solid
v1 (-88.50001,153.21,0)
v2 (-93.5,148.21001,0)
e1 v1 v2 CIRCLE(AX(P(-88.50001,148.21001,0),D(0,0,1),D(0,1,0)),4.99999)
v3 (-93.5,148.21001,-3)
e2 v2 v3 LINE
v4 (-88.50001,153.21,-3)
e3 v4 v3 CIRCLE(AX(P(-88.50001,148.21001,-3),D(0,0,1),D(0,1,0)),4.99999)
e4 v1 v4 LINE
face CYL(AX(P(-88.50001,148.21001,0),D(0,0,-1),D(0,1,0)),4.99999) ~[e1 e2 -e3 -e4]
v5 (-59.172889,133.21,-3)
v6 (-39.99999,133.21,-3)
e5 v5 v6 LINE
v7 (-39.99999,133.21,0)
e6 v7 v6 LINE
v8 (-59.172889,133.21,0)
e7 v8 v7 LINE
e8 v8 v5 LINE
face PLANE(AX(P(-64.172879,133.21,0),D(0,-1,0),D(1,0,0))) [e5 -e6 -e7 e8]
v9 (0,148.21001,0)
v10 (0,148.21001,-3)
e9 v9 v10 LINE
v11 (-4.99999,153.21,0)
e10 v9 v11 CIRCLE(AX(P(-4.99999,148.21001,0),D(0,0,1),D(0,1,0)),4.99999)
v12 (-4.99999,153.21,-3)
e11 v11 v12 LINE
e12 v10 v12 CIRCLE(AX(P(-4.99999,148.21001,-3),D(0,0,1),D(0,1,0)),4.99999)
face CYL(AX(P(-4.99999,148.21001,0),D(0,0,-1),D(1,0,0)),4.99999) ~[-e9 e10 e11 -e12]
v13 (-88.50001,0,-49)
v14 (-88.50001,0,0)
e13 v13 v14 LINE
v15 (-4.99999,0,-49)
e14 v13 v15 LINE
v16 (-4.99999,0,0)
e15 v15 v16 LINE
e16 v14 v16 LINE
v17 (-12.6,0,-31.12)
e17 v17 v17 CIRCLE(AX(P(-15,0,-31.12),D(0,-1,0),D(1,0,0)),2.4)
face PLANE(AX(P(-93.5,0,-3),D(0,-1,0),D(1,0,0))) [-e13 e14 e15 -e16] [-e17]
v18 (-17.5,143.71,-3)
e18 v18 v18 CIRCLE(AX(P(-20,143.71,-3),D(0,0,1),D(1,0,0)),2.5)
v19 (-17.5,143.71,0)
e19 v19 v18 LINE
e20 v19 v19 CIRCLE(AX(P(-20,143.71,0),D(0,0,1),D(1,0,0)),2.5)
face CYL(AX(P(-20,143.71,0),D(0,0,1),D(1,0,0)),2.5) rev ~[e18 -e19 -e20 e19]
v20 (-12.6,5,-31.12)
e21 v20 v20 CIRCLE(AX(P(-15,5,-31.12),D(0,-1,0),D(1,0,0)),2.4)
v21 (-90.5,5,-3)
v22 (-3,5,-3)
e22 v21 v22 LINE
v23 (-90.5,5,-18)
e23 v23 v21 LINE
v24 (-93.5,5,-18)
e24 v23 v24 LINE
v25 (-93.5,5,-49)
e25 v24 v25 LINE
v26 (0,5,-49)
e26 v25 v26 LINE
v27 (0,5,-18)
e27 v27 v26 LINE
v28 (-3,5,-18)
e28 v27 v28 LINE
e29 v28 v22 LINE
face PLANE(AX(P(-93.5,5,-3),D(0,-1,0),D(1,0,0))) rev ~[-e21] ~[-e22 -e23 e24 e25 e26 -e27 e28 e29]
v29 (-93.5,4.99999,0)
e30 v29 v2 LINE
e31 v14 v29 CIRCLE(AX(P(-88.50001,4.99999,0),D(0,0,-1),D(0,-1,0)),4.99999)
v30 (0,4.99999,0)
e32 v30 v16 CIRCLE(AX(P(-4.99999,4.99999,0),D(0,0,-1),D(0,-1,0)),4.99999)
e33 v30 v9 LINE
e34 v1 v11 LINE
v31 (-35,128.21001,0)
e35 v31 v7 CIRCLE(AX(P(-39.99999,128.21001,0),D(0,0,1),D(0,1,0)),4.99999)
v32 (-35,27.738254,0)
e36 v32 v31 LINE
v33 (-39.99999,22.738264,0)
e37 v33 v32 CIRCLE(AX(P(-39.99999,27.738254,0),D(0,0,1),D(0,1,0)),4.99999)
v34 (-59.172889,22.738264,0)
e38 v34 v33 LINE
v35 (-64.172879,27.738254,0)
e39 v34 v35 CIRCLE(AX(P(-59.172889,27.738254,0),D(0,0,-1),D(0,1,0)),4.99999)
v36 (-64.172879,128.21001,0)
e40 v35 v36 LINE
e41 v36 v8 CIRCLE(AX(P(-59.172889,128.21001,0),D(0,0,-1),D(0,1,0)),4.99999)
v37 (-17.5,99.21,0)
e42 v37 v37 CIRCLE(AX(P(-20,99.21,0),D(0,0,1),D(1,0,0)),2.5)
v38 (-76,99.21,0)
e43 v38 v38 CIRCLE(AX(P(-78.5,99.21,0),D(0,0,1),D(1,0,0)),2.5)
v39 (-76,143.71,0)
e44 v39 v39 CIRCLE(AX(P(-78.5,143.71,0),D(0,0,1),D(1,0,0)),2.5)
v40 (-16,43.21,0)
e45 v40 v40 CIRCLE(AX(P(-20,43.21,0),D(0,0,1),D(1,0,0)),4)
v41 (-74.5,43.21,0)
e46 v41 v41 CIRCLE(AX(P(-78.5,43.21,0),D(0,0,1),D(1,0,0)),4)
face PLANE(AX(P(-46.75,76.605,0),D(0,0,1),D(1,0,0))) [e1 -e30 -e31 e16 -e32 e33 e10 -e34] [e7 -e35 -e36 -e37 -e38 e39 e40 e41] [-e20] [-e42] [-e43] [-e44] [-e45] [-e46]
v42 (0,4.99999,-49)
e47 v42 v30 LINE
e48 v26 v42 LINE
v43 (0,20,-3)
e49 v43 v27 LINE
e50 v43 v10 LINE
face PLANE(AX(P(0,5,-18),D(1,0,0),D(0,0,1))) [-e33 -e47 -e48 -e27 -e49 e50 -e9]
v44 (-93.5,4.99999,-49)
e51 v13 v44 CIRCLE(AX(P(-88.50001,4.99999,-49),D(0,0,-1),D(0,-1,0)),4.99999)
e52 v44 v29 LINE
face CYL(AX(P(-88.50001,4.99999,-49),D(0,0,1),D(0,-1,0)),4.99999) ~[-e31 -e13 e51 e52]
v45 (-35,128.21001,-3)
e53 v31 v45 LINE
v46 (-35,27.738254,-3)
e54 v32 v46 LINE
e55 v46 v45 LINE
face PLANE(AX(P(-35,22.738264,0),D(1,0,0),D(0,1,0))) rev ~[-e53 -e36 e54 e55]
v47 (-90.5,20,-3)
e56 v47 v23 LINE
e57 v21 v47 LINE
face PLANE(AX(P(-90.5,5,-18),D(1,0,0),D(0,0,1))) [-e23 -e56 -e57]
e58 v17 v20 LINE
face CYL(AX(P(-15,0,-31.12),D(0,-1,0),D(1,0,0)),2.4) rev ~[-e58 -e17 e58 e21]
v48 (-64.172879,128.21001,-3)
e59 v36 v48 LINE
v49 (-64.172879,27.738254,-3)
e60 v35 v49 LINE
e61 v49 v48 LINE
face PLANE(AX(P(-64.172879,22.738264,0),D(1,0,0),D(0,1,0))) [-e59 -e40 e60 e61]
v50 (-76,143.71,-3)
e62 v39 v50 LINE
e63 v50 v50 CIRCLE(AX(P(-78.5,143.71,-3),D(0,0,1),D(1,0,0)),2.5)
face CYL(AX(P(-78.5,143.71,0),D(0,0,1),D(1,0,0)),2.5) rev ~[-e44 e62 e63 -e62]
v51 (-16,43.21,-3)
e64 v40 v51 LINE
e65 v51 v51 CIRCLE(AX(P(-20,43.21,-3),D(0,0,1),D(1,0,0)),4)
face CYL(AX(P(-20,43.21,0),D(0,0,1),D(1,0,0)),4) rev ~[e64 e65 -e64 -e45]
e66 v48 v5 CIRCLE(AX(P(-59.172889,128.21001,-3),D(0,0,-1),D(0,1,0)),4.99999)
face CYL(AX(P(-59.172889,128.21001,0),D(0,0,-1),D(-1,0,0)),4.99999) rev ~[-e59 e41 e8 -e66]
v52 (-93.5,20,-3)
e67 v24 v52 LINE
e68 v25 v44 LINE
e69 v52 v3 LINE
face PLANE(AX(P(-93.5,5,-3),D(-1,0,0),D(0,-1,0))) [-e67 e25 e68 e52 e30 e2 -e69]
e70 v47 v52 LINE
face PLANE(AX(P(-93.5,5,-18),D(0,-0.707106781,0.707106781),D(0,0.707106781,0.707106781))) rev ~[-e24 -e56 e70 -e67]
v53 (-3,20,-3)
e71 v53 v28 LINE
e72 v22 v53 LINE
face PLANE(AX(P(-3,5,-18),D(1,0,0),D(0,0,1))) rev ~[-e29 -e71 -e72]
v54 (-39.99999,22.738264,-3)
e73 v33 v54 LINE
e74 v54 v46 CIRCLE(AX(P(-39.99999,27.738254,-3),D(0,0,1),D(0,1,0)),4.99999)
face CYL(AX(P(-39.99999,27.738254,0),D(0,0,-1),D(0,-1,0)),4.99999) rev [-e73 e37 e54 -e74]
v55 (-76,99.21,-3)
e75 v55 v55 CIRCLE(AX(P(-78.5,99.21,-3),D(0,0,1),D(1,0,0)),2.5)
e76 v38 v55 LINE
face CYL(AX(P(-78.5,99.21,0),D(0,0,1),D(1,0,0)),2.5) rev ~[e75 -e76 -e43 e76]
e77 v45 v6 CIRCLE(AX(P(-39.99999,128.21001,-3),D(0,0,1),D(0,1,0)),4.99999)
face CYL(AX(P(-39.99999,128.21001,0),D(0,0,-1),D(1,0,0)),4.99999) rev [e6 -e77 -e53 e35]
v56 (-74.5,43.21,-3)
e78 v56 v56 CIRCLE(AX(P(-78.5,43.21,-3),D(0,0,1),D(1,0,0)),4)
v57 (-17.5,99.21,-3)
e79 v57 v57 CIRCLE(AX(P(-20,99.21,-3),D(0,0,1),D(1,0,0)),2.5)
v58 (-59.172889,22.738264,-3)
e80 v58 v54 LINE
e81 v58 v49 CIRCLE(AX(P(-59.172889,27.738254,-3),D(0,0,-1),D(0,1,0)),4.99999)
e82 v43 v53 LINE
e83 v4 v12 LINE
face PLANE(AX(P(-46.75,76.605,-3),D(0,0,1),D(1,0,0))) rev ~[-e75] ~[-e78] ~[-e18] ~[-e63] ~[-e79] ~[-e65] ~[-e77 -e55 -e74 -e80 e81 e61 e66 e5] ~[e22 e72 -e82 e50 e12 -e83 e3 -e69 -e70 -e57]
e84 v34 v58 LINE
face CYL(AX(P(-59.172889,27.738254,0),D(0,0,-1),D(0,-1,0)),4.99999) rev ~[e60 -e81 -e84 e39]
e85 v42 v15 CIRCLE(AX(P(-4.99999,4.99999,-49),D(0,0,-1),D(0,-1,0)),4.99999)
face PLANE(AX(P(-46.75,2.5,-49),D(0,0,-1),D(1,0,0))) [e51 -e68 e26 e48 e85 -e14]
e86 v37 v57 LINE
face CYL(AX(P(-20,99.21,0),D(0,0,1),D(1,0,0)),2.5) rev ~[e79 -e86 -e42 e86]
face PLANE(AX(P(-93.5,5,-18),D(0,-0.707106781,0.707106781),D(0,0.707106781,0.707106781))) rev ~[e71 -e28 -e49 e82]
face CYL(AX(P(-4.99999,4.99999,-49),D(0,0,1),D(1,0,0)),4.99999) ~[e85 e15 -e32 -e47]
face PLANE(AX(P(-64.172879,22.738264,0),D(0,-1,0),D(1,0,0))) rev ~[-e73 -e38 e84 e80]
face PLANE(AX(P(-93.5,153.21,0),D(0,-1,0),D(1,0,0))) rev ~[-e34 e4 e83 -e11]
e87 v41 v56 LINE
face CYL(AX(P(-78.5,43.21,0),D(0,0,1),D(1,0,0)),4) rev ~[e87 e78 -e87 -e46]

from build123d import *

# Parameters (mm, degrees)
F0_W     = 93.5
F0_H     = 153.21
F0_R     = 4
F0_R_2   = 2.5
F0_W_2   = 29.1728788614
F0_H_2   = 110.4717357084
F1_DEPTH = 3
F2_W     = 93.5
F2_H     = 5
F3_DEPTH = 46
F4_R     = 2.4
F5_DEPTH = 5
F6_W     = 3
F6_H     = 15
F7_DEPTH = 15
F9_DEPTH = 93.501
F10_R    = 4.99999


# Not quite as in the source:
# - a fillet or chamfer is up to 0.001 mm smaller than in the source, because OpenCascade refuses the exact size


with BuildPart() as f1:
    # F0 (on Top) → F1 (new body)
    with BuildSketch(Plane.XY):
        with Locations((-46.75, 76.605)):
            Rectangle(F0_W, F0_H)
        with Locations((-78.5, 43.21)):
            Circle(F0_R, mode=Mode.SUBTRACT)
        with Locations((-20, 43.21)):
            Circle(F0_R, mode=Mode.SUBTRACT)
        with Locations((-78.5, 99.21)):
            Circle(F0_R_2, mode=Mode.SUBTRACT)
        with Locations((-49.5864394307, 77.9741321458)):
            Rectangle(F0_W_2, F0_H_2, mode=Mode.SUBTRACT)
        with Locations((-78.5, 143.71)):
            Circle(F0_R_2, mode=Mode.SUBTRACT)
        with Locations((-20, 99.21)):
            Circle(F0_R_2, mode=Mode.SUBTRACT)
        with Locations((-20, 143.71)):
            Circle(F0_R_2, mode=Mode.SUBTRACT)
    extrude(amount=-F1_DEPTH)

    # F2 (on face) → F3 (join)
    with BuildSketch(Plane(origin=(0, 0, -3), x_dir=(1, 0, 0), z_dir=(0, 0, -1))):
        with Locations((-46.75, -2.5)):
            Rectangle(F2_W, F2_H)
    extrude(amount=F3_DEPTH)

    # F4 (on face) → F5 (cut, through all)
    with BuildSketch(Plane.XZ):
        with Locations((-15, -31.12)):
            Circle(F4_R)
    extrude(amount=-F5_DEPTH, mode=Mode.SUBTRACT)

    # F6 (on face) → F7 (join)
    with BuildSketch(Plane(origin=(0, 5, 0), x_dir=(-1, 0, 0), z_dir=(0, 1, 0))):
        with Locations((1.5, -10.5)):
            Rectangle(F6_W, F6_H)
        with Locations((92, -10.5)):
            Rectangle(F6_W, F6_H)
    extrude(amount=F7_DEPTH)

    # F8 (on face) → F9 (cut, through all)
    with BuildSketch(Plane(origin=(-93.5, 0, 0), x_dir=(0, -1, 0), z_dir=(-1, 0, 0))):
        Polygon((-5, -18), (-20, -3), (-20, -18), align=None)
    extrude(amount=-F9_DEPTH, mode=Mode.SUBTRACT)

    # F10 (radius 5 in the source; OpenCascade refuses exactly that, so slightly less here)
    f10_edges = [f1.edges().sort_by_distance(p)[0] for p in [
        (0, 153.21, -1.5),
        (-93.5, 153.21, -1.5),
        (0, 0, -24.5),
        (-93.5, 0, -24.5),
        (-64.172879, 133.21, -1.5),
        (-64.172879, 22.738264, -1.5),
        (-35, 22.738264, -1.5),
        (-35, 133.21, -1.5),
    ]]
    fillet(f10_edges, radius=F10_R)


solid = f1.part
